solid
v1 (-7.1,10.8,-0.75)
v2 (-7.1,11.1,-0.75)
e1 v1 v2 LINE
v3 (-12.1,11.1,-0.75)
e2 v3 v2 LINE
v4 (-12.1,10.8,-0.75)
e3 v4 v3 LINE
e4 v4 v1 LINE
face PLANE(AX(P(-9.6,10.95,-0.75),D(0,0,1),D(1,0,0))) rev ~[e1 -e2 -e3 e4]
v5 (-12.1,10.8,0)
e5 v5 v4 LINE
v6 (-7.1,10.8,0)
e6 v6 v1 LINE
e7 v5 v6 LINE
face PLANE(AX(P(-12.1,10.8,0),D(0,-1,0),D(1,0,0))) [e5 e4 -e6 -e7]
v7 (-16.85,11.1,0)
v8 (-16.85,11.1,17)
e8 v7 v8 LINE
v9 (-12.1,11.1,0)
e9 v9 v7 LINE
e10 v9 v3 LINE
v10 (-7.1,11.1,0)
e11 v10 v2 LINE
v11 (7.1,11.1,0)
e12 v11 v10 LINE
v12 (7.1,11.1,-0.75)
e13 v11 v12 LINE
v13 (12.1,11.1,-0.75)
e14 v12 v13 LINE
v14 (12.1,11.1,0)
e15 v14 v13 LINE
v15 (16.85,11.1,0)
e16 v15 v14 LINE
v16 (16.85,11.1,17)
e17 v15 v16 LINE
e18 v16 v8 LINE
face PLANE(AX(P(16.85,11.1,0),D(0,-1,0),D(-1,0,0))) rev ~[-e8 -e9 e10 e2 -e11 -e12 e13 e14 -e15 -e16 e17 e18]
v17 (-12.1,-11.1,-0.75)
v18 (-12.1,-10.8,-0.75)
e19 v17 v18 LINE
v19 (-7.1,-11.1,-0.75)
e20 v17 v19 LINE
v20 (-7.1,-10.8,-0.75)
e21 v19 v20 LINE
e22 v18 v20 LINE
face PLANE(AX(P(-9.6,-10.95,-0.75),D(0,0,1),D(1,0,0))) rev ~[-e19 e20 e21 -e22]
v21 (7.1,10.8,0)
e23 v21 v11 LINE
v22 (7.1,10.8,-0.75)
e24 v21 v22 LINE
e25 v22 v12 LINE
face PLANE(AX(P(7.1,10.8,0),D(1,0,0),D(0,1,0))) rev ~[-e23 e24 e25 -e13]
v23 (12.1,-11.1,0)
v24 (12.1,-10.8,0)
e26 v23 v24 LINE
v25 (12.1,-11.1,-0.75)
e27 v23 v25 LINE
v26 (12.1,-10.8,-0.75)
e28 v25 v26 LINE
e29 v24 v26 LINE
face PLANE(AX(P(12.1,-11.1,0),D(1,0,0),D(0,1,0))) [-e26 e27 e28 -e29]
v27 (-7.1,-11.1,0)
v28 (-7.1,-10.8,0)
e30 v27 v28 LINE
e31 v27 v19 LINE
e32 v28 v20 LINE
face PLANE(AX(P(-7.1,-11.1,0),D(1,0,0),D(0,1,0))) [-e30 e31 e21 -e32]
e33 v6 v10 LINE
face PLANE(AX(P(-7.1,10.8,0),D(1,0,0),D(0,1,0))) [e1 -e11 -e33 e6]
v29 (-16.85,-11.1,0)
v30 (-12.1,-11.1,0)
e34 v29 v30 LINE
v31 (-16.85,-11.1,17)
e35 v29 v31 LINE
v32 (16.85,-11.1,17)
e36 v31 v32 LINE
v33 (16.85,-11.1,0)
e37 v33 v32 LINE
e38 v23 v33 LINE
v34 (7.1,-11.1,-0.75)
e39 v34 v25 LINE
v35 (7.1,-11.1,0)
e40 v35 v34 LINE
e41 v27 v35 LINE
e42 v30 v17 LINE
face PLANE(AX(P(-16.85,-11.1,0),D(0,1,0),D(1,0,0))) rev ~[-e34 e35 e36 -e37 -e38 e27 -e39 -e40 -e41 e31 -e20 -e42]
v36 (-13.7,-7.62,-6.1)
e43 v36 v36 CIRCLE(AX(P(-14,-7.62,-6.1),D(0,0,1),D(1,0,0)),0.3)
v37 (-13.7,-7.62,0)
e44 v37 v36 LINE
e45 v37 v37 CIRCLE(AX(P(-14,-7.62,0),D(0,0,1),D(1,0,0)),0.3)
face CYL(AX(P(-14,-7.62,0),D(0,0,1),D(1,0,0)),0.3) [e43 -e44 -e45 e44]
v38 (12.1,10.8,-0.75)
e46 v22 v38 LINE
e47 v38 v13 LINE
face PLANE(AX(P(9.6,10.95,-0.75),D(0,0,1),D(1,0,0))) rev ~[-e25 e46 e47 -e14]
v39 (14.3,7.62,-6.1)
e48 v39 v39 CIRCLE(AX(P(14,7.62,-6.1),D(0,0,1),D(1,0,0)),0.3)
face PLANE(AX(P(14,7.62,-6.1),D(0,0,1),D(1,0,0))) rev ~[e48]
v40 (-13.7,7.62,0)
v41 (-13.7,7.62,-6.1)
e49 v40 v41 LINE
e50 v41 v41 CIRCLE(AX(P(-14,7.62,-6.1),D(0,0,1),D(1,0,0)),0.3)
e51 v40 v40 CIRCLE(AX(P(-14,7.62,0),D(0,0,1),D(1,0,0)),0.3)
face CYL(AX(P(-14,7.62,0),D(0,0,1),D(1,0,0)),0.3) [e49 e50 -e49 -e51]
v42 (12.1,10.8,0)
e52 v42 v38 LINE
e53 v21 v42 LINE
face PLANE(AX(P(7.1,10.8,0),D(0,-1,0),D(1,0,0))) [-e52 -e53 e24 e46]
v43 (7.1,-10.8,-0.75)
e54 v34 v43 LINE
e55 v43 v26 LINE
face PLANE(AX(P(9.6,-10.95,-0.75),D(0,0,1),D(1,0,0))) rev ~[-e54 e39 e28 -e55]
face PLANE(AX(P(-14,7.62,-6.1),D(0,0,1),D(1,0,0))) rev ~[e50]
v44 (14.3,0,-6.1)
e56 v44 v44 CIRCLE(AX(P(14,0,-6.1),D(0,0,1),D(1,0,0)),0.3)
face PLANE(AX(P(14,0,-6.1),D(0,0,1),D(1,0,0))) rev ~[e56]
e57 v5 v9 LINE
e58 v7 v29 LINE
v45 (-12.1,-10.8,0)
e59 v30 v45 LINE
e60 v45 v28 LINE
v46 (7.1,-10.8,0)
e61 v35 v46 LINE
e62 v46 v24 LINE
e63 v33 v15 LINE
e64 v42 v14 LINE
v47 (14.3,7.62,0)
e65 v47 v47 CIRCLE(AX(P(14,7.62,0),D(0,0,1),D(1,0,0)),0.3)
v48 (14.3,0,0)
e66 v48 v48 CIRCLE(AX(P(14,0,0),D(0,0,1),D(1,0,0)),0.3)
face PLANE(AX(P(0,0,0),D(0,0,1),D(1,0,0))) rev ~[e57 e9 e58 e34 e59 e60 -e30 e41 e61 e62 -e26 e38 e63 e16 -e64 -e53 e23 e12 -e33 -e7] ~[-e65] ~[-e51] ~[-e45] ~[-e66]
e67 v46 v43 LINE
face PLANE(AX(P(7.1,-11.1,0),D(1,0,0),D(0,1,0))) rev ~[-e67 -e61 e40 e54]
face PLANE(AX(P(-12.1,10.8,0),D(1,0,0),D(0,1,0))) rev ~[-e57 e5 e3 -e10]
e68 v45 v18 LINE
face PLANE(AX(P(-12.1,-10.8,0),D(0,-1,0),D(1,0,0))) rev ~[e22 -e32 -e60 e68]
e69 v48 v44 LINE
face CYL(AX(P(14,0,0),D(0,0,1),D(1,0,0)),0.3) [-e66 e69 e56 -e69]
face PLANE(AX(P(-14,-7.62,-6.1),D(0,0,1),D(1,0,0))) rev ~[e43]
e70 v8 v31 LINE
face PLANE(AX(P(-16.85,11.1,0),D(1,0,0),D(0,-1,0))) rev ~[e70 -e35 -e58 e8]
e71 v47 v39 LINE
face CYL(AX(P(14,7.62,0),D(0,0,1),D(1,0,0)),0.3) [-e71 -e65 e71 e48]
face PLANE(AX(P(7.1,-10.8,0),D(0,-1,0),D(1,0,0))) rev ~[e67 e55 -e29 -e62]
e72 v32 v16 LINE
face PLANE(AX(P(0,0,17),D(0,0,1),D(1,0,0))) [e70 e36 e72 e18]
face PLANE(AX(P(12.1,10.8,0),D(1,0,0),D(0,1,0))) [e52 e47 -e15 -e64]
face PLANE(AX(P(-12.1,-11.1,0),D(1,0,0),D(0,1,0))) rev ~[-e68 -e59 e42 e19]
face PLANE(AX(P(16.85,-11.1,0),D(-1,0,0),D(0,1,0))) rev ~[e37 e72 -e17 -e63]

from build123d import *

# Parameters (mm, degrees)
F0_R     = 0.3
F0_W     = 5
F0_H     = 0.3
F1_DEPTH = 17
F2_DEPTH = 0.75
F3_DEPTH = 6.1


# Not quite as in the source:
# - a feature names something its author has since deleted; it is built from what else it names


with BuildPart() as f1:
    # F0 (on Top) → F1 (new body)
    with BuildSketch(Plane.XY):
        Polygon((12.1, -11.1), (16.85, -11.1), (16.85, 11.1), (12.1, 11.1), (12.1, 10.8), (7.1, 10.8), (7.1, 11.1), (-7.1, 11.1), (-7.1, 10.8), (-12.1, 10.8), (-12.1, 11.1), (-16.85, 11.1), (-16.85, -11.1), (-12.1, -11.1), (-12.1, -10.8), (-7.1, -10.8), (-7.1, -11.1), (7.1, -11.1), (7.1, -10.8), (12.1, -10.8), align=None)
        with Locations((-14, -7.62)):
            Circle(F0_R, mode=Mode.SUBTRACT)
        with Locations((-14, 7.62)):
            Circle(F0_R, mode=Mode.SUBTRACT)
        with Locations((14, 0)):
            Circle(F0_R, mode=Mode.SUBTRACT)
        with Locations((14, 7.62)):
            Circle(F0_R, mode=Mode.SUBTRACT)
        with Locations((-9.6, 10.95)):
            Rectangle(F0_W, F0_H)
        with Locations((9.6, 10.95)):
            Rectangle(F0_W, F0_H)
        with Locations((9.6, -10.95)):
            Rectangle(F0_W, F0_H)
        with Locations((-9.6, -10.95)):
            Rectangle(F0_W, F0_H)
        with Locations((-14, -7.62)):
            Circle(F0_R)
        with Locations((-14, 7.62)):
            Circle(F0_R)
        with Locations((14, 0)):
            Circle(F0_R)
        with Locations((14, 7.62)):
            Circle(F0_R)
    extrude(amount=F1_DEPTH)

    # F0 (on Top) → F2 (join)
    with BuildSketch(Plane.XY):
        with Locations((9.6, 10.95)):
            Rectangle(F0_W, F0_H)
        with Locations((-9.6, 10.95)):
            Rectangle(F0_W, F0_H)
        with Locations((-9.6, -10.95)):
            Rectangle(F0_W, F0_H)
        with Locations((9.6, -10.95)):
            Rectangle(F0_W, F0_H)
    extrude(amount=-F2_DEPTH)

    # F0 (on Top) → F3 (join)
    with BuildSketch(Plane.XY):
        with Locations((14, 0)):
            Circle(F0_R)
        with Locations((-14, 7.62)):
            Circle(F0_R)
        with Locations((-14, -7.62)):
            Circle(F0_R)
        with Locations((14, 7.62)):
            Circle(F0_R)
    extrude(amount=-F3_DEPTH)


solid = f1.part
